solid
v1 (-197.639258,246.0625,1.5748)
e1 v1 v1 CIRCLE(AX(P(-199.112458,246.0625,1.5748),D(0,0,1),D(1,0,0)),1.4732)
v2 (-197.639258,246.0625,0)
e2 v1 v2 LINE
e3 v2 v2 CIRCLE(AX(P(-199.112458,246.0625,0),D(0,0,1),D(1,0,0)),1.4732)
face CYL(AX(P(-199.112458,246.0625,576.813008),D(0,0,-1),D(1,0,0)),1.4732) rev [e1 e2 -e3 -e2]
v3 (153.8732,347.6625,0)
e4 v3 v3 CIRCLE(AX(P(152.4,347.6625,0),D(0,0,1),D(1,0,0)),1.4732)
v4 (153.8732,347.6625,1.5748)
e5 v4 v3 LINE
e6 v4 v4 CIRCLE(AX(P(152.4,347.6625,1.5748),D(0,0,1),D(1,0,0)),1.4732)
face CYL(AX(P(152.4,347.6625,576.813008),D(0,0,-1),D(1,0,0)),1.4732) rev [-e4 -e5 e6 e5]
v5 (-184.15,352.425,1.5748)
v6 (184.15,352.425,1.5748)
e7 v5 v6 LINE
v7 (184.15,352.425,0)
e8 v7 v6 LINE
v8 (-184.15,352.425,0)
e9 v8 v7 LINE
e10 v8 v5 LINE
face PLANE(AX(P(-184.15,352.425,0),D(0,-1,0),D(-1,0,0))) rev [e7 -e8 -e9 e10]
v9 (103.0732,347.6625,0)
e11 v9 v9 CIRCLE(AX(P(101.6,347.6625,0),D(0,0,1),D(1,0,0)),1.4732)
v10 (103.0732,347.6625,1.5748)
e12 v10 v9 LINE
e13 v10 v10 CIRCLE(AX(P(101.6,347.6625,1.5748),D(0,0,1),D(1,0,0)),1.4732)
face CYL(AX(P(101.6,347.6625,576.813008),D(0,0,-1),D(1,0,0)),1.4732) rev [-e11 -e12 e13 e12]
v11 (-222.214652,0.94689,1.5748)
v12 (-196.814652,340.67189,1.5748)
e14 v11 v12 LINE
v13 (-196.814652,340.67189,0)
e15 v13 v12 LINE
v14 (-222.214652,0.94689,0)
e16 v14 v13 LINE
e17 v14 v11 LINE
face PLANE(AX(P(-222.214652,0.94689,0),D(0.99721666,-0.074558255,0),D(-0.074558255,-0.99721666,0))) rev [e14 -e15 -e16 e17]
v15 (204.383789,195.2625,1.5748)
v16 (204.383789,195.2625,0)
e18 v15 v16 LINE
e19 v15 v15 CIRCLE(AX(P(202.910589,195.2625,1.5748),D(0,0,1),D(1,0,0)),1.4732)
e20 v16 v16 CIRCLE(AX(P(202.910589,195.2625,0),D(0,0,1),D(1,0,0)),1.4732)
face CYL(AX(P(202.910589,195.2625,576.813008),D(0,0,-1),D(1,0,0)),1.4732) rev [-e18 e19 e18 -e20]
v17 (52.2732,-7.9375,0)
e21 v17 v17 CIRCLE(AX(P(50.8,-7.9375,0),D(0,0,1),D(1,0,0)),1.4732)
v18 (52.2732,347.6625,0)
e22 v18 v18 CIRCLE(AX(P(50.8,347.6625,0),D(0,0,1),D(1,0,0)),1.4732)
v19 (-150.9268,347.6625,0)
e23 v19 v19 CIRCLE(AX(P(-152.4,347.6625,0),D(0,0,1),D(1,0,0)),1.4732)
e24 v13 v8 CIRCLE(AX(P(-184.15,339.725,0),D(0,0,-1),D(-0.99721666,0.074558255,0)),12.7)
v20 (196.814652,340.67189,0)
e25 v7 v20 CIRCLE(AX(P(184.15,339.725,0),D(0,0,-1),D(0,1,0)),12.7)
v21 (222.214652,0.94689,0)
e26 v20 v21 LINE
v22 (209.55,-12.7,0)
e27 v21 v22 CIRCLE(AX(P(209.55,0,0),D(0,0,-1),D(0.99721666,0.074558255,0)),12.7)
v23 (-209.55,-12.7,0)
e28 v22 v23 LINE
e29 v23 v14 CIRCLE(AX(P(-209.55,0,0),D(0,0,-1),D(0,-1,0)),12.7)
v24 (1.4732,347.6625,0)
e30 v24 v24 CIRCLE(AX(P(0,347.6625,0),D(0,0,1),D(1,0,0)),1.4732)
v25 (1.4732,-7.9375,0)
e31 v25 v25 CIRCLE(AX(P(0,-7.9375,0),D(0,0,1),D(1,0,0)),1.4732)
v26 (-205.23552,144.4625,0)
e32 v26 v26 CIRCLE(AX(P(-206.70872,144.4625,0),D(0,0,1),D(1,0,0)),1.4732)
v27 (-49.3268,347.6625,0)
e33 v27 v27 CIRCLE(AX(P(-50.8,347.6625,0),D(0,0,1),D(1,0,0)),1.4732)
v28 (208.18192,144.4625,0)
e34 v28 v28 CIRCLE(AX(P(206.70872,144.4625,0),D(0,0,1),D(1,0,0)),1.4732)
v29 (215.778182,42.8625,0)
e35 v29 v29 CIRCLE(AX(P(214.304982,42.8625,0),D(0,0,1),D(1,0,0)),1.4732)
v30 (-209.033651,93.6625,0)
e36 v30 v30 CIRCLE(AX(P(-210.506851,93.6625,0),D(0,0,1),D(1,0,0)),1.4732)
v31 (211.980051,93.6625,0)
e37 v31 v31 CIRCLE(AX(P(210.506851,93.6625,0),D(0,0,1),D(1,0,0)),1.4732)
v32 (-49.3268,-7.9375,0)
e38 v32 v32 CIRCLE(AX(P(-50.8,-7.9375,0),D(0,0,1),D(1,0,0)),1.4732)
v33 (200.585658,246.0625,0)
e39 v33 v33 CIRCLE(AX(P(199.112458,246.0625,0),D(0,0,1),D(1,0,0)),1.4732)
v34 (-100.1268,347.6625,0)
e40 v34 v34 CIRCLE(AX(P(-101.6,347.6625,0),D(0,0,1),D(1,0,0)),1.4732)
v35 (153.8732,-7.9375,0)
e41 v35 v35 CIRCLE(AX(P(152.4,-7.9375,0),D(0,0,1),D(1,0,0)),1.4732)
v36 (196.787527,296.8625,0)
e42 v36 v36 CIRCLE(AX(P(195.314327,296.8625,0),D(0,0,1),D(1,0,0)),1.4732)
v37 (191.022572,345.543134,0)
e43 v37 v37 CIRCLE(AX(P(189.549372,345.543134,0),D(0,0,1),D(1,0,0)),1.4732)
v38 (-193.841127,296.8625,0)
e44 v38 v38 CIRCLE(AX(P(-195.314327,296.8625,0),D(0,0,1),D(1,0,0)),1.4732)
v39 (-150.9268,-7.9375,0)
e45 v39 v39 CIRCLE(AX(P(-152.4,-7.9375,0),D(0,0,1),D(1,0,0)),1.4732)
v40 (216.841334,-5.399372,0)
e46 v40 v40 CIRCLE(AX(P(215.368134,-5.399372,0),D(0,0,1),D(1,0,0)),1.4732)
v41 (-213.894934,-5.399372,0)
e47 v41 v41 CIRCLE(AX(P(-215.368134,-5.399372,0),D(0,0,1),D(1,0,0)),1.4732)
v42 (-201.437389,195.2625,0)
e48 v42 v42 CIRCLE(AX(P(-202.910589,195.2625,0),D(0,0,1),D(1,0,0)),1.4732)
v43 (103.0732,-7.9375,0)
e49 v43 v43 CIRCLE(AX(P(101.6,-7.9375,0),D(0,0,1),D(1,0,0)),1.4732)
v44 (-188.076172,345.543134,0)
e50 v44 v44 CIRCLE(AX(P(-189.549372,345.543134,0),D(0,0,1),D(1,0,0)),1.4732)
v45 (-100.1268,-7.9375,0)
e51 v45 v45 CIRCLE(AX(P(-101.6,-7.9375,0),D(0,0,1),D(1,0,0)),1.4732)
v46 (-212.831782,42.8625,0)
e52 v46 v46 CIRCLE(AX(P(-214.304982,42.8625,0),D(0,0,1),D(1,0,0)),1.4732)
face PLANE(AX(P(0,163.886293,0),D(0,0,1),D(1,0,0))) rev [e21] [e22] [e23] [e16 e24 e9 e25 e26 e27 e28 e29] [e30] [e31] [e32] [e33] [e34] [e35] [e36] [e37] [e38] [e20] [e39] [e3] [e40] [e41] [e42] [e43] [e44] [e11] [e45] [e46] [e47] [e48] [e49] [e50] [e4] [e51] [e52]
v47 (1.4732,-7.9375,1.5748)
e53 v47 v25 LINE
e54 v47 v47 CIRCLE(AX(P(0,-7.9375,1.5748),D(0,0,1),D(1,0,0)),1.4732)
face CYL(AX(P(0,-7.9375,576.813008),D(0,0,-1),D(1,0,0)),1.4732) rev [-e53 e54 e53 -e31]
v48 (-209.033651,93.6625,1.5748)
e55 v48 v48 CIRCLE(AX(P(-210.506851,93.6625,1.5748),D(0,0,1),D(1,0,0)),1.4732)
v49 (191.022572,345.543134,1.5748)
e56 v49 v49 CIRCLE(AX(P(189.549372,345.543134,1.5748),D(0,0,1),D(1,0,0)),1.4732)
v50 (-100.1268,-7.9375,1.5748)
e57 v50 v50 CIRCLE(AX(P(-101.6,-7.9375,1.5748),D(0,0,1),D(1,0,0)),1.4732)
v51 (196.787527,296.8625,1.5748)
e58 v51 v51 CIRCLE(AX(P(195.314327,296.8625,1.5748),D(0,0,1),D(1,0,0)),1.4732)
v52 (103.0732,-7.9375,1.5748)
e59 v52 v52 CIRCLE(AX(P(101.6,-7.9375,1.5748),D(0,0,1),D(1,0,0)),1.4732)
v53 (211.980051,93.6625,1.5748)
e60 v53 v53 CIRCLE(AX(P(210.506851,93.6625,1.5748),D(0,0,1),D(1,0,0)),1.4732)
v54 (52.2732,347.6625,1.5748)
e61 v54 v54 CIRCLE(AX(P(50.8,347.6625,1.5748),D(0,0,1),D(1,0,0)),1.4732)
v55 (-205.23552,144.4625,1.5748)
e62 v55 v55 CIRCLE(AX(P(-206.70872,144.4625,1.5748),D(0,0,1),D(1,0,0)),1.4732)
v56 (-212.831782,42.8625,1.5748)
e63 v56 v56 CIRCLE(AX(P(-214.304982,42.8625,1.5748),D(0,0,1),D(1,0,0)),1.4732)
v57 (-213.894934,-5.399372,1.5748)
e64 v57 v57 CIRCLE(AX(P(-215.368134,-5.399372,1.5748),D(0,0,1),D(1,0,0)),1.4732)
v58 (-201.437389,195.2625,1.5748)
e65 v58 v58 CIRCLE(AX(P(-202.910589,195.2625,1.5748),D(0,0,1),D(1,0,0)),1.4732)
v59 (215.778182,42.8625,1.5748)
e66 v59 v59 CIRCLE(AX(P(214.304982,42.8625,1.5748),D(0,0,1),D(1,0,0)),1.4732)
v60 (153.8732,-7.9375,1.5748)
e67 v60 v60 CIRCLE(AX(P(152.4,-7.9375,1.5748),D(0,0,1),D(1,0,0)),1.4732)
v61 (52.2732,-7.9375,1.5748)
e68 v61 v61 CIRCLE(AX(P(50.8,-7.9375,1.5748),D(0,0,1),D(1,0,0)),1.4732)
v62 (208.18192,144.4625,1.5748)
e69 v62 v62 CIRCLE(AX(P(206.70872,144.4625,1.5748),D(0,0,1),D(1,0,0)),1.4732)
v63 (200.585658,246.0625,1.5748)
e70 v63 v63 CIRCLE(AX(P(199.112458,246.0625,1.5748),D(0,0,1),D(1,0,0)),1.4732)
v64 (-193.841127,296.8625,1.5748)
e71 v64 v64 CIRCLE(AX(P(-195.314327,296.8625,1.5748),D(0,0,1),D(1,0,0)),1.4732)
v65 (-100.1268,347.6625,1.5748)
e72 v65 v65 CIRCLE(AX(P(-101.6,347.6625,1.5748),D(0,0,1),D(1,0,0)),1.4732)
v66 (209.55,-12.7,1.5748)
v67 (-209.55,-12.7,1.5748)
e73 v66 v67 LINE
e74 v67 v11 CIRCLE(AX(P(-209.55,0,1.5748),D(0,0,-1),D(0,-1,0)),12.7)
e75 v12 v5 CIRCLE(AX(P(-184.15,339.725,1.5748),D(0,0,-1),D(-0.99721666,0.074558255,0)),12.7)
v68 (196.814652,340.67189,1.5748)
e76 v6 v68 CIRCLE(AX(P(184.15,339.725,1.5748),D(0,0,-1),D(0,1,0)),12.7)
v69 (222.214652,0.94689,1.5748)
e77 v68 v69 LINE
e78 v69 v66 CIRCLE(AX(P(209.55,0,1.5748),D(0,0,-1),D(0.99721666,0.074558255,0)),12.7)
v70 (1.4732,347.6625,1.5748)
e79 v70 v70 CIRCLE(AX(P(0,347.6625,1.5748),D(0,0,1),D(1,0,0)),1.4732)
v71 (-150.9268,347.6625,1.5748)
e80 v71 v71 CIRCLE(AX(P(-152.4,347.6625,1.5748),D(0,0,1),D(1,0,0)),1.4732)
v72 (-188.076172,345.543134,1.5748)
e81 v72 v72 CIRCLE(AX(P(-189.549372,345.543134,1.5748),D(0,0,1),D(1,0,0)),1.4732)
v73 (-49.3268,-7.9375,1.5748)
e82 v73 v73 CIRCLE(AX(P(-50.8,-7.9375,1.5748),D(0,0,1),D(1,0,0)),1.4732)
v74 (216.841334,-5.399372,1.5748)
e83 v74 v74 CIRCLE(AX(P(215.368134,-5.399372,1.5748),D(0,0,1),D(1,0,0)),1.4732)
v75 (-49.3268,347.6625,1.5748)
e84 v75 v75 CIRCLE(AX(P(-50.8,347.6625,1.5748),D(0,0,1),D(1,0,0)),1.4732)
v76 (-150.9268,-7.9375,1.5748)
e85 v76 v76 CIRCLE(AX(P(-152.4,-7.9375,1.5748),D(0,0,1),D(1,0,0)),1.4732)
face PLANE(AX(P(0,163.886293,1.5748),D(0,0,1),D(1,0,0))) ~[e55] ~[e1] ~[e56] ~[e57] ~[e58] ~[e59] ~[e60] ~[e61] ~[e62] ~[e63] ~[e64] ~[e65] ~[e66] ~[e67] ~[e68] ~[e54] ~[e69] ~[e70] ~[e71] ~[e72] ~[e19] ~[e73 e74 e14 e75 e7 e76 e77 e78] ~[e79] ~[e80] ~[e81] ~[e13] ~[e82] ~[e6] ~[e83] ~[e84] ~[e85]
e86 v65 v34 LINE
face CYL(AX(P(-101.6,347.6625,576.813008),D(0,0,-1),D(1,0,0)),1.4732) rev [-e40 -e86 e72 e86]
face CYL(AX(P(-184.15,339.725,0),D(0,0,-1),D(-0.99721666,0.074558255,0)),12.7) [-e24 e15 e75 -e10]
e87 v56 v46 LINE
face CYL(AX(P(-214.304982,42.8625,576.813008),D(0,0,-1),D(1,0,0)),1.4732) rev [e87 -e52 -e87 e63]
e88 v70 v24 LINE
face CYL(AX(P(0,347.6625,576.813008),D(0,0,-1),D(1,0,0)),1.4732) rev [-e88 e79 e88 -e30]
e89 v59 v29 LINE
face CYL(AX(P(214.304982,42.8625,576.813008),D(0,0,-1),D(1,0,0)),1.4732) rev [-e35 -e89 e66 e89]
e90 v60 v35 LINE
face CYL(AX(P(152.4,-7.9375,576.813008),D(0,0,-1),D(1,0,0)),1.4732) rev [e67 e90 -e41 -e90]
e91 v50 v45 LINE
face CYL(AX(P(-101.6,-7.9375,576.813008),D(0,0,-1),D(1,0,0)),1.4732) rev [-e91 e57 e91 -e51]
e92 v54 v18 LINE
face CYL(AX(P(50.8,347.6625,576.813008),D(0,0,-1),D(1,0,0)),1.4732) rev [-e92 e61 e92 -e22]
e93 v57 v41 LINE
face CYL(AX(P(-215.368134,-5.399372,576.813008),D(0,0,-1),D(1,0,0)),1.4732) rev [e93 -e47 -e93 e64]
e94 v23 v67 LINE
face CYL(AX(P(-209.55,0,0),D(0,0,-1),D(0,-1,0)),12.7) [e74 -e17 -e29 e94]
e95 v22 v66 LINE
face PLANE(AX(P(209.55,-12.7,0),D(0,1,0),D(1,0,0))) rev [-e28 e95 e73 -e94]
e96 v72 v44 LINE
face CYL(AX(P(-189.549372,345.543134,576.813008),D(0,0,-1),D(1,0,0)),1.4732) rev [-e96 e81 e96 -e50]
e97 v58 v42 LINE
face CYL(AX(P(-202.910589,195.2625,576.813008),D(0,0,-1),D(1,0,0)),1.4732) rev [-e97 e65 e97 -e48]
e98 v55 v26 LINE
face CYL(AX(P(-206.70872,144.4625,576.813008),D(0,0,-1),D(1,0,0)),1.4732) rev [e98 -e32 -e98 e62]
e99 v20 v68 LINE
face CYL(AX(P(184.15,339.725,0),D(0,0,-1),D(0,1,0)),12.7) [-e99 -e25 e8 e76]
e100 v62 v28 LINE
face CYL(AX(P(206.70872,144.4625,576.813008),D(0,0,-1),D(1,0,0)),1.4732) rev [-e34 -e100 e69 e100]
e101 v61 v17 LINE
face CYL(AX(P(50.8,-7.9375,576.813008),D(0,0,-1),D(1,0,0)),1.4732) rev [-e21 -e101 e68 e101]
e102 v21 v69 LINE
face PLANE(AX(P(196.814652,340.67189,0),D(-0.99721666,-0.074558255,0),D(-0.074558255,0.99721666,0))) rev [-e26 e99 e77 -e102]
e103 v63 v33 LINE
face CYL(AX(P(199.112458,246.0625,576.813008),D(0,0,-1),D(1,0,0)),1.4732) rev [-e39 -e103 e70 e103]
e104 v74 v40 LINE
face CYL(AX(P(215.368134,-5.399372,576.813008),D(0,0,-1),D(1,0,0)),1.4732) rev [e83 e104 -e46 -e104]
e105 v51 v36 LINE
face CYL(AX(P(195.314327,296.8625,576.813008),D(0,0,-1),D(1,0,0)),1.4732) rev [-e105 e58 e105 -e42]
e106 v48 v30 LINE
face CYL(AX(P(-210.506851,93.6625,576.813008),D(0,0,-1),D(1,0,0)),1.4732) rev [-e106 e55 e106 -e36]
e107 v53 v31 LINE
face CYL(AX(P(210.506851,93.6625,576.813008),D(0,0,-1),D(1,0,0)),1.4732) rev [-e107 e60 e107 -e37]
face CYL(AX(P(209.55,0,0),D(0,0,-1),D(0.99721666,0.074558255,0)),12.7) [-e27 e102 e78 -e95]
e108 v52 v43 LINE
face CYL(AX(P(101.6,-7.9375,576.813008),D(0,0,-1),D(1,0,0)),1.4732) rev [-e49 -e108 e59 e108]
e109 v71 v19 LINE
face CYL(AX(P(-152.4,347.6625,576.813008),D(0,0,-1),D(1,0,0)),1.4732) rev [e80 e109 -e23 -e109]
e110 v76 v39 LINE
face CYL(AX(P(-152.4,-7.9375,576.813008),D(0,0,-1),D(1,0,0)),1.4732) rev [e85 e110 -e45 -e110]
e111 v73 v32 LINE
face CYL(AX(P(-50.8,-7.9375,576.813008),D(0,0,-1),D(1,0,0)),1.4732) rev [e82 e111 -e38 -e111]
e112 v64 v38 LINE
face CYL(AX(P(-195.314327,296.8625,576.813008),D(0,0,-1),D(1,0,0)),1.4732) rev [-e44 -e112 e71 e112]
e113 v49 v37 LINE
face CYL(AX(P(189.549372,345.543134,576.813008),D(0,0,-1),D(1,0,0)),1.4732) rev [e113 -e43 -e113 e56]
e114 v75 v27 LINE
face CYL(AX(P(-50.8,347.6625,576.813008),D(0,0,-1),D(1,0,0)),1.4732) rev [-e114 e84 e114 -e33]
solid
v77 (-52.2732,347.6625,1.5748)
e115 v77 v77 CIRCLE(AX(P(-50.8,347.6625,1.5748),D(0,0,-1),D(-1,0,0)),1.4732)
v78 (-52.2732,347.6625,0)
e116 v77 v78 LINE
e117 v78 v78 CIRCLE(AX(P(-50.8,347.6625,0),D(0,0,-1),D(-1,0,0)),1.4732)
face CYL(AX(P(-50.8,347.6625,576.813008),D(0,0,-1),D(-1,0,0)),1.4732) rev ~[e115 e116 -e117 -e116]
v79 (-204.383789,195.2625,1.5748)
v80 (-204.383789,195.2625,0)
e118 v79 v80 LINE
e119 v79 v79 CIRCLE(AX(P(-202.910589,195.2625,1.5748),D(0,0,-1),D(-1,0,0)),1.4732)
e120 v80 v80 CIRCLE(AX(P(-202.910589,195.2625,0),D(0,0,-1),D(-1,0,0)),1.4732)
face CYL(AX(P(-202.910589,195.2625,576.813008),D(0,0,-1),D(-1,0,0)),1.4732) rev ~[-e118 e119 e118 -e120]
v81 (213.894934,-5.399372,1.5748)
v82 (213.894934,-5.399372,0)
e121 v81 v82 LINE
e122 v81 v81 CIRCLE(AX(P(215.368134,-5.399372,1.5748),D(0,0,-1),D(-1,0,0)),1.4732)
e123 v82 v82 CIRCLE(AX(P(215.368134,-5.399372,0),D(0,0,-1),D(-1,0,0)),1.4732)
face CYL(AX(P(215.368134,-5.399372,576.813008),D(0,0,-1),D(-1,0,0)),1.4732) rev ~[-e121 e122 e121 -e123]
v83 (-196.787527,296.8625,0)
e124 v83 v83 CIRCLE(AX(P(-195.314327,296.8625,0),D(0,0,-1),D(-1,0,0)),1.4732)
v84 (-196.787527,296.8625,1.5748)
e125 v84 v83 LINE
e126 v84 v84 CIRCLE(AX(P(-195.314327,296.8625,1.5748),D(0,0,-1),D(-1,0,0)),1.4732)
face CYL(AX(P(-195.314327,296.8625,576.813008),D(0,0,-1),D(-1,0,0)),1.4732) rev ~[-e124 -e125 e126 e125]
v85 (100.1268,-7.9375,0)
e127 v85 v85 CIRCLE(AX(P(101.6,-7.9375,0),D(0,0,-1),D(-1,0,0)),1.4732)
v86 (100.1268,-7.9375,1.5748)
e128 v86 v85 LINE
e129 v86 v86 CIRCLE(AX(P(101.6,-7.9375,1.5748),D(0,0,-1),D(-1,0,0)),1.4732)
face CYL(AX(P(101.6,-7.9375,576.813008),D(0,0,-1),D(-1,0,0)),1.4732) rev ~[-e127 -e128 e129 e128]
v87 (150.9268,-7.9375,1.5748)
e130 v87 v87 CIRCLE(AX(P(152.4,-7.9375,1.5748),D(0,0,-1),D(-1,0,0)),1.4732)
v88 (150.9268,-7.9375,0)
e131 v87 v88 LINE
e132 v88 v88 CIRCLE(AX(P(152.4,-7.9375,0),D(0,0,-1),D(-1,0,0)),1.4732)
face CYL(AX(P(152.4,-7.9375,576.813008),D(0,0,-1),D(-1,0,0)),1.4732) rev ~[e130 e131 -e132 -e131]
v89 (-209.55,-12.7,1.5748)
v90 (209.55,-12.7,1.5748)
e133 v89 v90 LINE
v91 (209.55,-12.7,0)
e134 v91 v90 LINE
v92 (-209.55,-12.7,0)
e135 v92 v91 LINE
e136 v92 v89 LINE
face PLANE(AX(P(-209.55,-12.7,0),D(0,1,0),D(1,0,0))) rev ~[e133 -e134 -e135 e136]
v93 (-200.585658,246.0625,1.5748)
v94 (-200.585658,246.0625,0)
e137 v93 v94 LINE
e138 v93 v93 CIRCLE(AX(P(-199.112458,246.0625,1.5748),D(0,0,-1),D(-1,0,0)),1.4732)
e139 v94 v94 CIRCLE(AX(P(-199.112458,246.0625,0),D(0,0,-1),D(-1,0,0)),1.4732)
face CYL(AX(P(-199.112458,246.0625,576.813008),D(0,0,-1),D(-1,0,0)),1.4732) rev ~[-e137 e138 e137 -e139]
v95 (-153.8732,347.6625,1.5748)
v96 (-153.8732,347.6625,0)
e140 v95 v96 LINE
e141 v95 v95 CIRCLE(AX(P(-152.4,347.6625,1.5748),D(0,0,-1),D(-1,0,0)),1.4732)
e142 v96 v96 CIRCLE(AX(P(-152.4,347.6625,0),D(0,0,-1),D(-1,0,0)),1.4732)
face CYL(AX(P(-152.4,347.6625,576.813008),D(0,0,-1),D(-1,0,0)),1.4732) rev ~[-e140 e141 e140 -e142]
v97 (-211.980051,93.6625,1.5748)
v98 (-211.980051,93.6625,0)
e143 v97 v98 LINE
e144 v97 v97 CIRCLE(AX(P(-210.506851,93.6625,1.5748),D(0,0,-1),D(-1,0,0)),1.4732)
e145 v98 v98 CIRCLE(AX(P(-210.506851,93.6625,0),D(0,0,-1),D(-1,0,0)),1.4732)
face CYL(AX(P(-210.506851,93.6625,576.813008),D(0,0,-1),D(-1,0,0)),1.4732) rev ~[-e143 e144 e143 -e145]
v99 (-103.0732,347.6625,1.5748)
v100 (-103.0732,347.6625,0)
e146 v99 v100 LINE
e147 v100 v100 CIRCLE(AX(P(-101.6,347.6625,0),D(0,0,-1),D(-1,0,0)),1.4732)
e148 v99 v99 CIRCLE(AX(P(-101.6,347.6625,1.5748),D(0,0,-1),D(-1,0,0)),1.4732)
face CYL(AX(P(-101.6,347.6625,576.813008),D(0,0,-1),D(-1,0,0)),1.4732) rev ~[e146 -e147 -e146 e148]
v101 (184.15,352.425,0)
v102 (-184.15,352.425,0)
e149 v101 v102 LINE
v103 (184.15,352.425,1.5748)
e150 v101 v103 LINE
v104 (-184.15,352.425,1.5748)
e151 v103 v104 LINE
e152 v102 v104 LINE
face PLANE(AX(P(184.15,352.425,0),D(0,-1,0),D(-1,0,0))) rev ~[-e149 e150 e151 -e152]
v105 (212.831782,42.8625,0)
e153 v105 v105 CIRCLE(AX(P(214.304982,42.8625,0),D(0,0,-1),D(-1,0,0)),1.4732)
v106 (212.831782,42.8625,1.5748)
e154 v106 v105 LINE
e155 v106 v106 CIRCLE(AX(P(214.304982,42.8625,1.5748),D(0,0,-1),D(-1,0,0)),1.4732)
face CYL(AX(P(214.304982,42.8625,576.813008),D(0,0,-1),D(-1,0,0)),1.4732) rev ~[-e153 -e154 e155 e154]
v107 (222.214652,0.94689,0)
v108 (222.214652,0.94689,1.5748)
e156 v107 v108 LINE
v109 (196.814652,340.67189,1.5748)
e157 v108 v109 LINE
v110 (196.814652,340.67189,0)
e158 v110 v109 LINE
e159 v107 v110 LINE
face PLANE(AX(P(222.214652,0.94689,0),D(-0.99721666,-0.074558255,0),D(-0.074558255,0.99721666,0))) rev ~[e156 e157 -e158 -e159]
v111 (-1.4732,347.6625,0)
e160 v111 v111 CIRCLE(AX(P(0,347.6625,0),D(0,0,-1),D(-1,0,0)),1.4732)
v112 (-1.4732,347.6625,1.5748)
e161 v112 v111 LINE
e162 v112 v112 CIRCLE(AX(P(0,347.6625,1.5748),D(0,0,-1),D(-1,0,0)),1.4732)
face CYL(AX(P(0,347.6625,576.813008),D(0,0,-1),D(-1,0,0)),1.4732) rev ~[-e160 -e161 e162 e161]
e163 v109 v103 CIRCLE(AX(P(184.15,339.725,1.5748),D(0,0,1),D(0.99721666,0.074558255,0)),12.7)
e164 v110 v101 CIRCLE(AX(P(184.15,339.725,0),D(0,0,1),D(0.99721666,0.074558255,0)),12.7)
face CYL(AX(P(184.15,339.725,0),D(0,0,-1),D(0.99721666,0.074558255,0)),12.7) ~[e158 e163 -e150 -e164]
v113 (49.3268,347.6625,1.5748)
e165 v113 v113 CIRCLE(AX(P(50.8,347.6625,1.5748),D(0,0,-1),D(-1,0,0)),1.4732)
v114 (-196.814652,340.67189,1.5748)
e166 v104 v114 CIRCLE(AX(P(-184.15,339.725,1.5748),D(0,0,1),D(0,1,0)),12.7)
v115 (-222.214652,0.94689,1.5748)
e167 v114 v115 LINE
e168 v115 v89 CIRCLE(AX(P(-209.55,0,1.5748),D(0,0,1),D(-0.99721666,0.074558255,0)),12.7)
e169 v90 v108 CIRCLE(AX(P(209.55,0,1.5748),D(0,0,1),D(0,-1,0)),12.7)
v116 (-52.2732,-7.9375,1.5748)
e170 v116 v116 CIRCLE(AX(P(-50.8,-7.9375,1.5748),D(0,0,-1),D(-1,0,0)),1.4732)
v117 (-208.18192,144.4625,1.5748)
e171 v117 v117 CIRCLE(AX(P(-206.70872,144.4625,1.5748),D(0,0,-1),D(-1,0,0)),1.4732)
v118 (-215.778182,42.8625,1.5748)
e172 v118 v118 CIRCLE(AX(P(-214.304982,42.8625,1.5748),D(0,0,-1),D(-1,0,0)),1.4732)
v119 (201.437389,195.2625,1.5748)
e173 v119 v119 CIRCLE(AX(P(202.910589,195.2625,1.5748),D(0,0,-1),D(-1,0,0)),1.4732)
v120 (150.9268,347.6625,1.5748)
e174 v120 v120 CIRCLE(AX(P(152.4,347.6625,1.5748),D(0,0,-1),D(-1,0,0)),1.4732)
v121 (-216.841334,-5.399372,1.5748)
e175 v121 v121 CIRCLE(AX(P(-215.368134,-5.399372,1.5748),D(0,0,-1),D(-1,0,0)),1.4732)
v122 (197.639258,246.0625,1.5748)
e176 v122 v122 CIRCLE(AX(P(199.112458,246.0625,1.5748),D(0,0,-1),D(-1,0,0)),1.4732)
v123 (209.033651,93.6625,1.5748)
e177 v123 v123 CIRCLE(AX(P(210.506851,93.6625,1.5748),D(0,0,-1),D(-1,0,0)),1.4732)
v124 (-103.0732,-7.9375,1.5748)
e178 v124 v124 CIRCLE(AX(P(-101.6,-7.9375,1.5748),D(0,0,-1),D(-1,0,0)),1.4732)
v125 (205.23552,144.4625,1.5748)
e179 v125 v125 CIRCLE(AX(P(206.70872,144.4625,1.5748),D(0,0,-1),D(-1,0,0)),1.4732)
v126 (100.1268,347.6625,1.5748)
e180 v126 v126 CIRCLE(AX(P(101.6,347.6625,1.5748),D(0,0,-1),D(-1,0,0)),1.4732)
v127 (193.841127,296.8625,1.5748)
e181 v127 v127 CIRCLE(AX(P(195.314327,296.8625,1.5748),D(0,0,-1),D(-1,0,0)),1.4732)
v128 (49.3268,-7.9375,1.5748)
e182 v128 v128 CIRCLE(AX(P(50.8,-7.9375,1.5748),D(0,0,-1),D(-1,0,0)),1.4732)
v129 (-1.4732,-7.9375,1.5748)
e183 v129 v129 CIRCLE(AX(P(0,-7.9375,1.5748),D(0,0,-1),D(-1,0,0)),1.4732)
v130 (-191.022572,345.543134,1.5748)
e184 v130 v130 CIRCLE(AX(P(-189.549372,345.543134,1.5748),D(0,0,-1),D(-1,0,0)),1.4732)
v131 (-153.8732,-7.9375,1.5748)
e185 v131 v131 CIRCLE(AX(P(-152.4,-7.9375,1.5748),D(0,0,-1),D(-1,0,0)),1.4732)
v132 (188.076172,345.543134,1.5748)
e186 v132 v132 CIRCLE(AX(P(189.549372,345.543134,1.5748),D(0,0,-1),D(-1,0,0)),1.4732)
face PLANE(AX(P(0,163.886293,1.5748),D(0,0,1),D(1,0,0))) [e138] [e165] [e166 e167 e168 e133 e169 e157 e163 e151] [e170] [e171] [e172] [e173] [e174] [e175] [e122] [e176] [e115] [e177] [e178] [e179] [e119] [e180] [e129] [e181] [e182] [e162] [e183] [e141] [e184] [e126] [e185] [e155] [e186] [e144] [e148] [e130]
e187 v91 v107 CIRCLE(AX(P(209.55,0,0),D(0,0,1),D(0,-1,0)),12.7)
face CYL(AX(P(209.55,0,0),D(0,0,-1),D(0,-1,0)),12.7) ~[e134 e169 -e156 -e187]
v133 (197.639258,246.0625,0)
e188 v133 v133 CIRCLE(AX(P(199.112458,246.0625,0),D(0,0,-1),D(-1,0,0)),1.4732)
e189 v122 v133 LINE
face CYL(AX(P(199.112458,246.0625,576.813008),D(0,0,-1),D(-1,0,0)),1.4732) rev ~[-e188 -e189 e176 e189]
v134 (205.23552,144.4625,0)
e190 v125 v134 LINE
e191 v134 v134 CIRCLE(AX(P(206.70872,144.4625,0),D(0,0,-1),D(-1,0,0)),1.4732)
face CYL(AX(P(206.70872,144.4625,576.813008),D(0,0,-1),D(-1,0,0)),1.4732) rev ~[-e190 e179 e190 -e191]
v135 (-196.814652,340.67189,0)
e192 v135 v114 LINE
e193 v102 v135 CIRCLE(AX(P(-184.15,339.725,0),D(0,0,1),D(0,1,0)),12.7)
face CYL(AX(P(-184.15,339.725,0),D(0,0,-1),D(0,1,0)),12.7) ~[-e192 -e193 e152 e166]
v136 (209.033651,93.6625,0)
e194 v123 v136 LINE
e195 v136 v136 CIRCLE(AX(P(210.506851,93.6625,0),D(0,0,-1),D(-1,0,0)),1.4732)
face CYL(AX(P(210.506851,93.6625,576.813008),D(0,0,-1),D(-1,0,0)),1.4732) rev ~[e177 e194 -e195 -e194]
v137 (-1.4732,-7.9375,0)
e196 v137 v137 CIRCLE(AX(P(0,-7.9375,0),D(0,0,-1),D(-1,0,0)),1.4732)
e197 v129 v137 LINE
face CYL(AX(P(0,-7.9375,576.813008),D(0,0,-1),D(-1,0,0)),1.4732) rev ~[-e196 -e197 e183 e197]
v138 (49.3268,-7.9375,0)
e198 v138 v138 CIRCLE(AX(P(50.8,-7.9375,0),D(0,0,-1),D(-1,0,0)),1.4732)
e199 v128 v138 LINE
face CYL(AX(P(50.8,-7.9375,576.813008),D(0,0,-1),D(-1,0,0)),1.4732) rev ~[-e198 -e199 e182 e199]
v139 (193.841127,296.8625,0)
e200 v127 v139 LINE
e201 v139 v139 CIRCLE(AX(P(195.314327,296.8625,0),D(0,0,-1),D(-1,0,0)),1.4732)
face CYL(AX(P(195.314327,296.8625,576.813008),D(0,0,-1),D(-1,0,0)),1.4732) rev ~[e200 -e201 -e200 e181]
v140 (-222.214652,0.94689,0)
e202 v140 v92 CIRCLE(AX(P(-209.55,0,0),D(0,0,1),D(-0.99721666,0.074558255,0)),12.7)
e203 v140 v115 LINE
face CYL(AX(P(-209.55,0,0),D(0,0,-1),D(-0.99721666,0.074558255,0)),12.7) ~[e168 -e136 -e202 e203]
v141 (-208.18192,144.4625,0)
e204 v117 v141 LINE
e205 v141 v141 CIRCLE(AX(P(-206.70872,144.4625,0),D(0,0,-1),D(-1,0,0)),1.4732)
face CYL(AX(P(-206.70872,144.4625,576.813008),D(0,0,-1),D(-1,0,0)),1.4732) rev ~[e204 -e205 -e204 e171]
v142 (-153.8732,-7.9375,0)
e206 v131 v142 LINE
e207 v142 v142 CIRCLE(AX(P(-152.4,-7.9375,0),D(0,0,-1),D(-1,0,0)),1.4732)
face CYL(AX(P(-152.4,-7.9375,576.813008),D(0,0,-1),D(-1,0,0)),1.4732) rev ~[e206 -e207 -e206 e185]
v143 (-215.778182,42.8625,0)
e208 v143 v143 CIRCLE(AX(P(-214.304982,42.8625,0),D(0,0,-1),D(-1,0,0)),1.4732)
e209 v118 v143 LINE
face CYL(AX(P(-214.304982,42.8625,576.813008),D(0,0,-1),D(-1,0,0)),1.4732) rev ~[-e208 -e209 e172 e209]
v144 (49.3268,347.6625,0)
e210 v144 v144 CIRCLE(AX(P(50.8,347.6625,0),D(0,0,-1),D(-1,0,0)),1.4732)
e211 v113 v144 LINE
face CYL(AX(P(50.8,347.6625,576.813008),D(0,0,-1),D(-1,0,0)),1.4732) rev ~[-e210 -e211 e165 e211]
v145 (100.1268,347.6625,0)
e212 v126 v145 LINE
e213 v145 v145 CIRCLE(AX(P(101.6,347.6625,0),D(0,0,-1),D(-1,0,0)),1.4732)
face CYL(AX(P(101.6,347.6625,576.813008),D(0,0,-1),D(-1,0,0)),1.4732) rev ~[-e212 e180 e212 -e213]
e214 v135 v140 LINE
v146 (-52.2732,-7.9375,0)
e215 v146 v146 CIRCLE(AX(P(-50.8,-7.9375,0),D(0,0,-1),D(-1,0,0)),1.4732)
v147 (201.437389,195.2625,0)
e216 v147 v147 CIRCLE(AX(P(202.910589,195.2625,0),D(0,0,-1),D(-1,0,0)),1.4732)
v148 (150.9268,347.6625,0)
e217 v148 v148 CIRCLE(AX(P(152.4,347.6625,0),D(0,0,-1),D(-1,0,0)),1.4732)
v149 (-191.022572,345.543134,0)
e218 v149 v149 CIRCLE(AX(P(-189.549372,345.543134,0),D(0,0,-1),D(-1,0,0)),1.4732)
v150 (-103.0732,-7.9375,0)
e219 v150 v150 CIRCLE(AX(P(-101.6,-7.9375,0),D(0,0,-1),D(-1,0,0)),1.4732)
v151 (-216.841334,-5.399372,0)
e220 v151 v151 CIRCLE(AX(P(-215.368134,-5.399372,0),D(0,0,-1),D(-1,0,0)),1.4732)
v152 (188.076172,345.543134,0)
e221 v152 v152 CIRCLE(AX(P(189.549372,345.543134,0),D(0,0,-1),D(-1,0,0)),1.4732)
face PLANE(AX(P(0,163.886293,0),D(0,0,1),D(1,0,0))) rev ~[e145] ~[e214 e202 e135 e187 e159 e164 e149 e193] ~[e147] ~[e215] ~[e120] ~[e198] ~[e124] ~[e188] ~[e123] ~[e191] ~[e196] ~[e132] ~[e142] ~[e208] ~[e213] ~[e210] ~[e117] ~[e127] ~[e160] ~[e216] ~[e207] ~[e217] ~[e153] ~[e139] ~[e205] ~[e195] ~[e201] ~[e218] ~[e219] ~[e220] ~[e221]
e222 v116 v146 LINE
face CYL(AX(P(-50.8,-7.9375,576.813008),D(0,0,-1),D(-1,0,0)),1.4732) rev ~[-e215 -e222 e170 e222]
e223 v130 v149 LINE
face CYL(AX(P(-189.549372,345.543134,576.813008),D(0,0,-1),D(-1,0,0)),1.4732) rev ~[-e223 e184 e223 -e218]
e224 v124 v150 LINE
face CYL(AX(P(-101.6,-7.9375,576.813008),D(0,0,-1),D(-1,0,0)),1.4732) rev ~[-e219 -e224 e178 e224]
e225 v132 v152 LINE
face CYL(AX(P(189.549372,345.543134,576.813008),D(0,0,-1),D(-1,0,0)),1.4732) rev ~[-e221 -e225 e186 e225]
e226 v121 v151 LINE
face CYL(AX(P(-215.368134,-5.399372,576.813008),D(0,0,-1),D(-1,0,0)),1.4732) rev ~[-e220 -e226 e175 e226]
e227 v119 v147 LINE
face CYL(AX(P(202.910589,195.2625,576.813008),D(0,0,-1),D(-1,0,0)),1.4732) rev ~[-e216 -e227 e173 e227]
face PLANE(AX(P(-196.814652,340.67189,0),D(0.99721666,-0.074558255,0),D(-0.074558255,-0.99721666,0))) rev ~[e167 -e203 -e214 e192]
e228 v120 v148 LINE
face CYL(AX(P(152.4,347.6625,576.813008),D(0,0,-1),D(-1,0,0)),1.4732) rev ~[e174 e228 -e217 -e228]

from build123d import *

# Parameters (mm, degrees)
F1_DEPTH = 1.5748
F3_D     = 2.9464


# Not quite as in the source:
# - a feature names something its author has since deleted; it is built from what else it names


with BuildPart() as f1:
    # F0 (on Top) → F1 (new body)
    with BuildSketch(Plane.XY):
        with BuildLine():
            Line((53.975, 352.425), (-53.975, 352.425))
            Line((-53.975, 352.425), (-184.15, 352.425))
            ThreePointArc((-184.15, 352.425), (-192.7889958635, 349.0340144736), (-196.8146515797, 340.6718898377))
            Line((-196.8146515797, 340.6718898377), (-222.2146515797, 0.9468898377))
            ThreePointArc((-222.2146515797, 0.9468898377), (-218.8590144736, -8.6389958635), (-209.55, -12.7))
            Line((-209.55, -12.7), (-53.975, -12.7))
            Line((-53.975, -12.7), (53.975, -12.7))
            Line((53.975, -12.7), (209.55, -12.7))
            ThreePointArc((209.55, -12.7), (218.8590144736, -8.6389958635), (222.2146515797, 0.9468898377))
            Line((222.2146515797, 0.9468898377), (196.8146515797, 340.6718898377))
            ThreePointArc((196.8146515797, 340.6718898377), (192.7889958635, 349.0340144736), (184.15, 352.425))
            Line((184.15, 352.425), (53.975, 352.425))
        make_face()
    extrude(amount=F1_DEPTH)

    # F3 (through all)
    with Locations(Plane.XY.offset(1.5748)):
        with Locations((-152.4, 347.6625), (-101.6, 347.6625), (-50.8, 347.6625), (0, 347.6625), (50.8, 347.6625), (101.6, 347.6625), (152.4, 347.6625), (195.3143273232, 296.8625), (199.1124581643, 246.0625), (202.9105890054, 195.2625), (206.7087198466, 144.4625), (210.5068506877, 93.6625), (214.3049815288, 42.8625), (152.4, -7.9375), (101.6, -7.9375), (50.8, -7.9375), (0, -7.9375), (-50.8, -7.9375), (-101.6, -7.9375), (-152.4, -7.9375), (-214.3049815288, 42.8625), (-210.5068506877, 93.6625), (-206.7087198466, 144.4625), (-202.9105890054, 195.2625), (-199.1124581643, 246.0625), (-195.3143273232, 296.8625), (215.368134046, -5.3993724147), (-215.368134046, -5.3993724147), (-189.5493724147, 345.543134046), (189.5493724147, 345.543134046)):
            Hole(F3_D / 2)


with BuildPart() as f4_1:
    # F4: instance of F1
    add(f1.part.mirror(Plane.YZ))


solid = Compound([f1.part, f4_1.part])
